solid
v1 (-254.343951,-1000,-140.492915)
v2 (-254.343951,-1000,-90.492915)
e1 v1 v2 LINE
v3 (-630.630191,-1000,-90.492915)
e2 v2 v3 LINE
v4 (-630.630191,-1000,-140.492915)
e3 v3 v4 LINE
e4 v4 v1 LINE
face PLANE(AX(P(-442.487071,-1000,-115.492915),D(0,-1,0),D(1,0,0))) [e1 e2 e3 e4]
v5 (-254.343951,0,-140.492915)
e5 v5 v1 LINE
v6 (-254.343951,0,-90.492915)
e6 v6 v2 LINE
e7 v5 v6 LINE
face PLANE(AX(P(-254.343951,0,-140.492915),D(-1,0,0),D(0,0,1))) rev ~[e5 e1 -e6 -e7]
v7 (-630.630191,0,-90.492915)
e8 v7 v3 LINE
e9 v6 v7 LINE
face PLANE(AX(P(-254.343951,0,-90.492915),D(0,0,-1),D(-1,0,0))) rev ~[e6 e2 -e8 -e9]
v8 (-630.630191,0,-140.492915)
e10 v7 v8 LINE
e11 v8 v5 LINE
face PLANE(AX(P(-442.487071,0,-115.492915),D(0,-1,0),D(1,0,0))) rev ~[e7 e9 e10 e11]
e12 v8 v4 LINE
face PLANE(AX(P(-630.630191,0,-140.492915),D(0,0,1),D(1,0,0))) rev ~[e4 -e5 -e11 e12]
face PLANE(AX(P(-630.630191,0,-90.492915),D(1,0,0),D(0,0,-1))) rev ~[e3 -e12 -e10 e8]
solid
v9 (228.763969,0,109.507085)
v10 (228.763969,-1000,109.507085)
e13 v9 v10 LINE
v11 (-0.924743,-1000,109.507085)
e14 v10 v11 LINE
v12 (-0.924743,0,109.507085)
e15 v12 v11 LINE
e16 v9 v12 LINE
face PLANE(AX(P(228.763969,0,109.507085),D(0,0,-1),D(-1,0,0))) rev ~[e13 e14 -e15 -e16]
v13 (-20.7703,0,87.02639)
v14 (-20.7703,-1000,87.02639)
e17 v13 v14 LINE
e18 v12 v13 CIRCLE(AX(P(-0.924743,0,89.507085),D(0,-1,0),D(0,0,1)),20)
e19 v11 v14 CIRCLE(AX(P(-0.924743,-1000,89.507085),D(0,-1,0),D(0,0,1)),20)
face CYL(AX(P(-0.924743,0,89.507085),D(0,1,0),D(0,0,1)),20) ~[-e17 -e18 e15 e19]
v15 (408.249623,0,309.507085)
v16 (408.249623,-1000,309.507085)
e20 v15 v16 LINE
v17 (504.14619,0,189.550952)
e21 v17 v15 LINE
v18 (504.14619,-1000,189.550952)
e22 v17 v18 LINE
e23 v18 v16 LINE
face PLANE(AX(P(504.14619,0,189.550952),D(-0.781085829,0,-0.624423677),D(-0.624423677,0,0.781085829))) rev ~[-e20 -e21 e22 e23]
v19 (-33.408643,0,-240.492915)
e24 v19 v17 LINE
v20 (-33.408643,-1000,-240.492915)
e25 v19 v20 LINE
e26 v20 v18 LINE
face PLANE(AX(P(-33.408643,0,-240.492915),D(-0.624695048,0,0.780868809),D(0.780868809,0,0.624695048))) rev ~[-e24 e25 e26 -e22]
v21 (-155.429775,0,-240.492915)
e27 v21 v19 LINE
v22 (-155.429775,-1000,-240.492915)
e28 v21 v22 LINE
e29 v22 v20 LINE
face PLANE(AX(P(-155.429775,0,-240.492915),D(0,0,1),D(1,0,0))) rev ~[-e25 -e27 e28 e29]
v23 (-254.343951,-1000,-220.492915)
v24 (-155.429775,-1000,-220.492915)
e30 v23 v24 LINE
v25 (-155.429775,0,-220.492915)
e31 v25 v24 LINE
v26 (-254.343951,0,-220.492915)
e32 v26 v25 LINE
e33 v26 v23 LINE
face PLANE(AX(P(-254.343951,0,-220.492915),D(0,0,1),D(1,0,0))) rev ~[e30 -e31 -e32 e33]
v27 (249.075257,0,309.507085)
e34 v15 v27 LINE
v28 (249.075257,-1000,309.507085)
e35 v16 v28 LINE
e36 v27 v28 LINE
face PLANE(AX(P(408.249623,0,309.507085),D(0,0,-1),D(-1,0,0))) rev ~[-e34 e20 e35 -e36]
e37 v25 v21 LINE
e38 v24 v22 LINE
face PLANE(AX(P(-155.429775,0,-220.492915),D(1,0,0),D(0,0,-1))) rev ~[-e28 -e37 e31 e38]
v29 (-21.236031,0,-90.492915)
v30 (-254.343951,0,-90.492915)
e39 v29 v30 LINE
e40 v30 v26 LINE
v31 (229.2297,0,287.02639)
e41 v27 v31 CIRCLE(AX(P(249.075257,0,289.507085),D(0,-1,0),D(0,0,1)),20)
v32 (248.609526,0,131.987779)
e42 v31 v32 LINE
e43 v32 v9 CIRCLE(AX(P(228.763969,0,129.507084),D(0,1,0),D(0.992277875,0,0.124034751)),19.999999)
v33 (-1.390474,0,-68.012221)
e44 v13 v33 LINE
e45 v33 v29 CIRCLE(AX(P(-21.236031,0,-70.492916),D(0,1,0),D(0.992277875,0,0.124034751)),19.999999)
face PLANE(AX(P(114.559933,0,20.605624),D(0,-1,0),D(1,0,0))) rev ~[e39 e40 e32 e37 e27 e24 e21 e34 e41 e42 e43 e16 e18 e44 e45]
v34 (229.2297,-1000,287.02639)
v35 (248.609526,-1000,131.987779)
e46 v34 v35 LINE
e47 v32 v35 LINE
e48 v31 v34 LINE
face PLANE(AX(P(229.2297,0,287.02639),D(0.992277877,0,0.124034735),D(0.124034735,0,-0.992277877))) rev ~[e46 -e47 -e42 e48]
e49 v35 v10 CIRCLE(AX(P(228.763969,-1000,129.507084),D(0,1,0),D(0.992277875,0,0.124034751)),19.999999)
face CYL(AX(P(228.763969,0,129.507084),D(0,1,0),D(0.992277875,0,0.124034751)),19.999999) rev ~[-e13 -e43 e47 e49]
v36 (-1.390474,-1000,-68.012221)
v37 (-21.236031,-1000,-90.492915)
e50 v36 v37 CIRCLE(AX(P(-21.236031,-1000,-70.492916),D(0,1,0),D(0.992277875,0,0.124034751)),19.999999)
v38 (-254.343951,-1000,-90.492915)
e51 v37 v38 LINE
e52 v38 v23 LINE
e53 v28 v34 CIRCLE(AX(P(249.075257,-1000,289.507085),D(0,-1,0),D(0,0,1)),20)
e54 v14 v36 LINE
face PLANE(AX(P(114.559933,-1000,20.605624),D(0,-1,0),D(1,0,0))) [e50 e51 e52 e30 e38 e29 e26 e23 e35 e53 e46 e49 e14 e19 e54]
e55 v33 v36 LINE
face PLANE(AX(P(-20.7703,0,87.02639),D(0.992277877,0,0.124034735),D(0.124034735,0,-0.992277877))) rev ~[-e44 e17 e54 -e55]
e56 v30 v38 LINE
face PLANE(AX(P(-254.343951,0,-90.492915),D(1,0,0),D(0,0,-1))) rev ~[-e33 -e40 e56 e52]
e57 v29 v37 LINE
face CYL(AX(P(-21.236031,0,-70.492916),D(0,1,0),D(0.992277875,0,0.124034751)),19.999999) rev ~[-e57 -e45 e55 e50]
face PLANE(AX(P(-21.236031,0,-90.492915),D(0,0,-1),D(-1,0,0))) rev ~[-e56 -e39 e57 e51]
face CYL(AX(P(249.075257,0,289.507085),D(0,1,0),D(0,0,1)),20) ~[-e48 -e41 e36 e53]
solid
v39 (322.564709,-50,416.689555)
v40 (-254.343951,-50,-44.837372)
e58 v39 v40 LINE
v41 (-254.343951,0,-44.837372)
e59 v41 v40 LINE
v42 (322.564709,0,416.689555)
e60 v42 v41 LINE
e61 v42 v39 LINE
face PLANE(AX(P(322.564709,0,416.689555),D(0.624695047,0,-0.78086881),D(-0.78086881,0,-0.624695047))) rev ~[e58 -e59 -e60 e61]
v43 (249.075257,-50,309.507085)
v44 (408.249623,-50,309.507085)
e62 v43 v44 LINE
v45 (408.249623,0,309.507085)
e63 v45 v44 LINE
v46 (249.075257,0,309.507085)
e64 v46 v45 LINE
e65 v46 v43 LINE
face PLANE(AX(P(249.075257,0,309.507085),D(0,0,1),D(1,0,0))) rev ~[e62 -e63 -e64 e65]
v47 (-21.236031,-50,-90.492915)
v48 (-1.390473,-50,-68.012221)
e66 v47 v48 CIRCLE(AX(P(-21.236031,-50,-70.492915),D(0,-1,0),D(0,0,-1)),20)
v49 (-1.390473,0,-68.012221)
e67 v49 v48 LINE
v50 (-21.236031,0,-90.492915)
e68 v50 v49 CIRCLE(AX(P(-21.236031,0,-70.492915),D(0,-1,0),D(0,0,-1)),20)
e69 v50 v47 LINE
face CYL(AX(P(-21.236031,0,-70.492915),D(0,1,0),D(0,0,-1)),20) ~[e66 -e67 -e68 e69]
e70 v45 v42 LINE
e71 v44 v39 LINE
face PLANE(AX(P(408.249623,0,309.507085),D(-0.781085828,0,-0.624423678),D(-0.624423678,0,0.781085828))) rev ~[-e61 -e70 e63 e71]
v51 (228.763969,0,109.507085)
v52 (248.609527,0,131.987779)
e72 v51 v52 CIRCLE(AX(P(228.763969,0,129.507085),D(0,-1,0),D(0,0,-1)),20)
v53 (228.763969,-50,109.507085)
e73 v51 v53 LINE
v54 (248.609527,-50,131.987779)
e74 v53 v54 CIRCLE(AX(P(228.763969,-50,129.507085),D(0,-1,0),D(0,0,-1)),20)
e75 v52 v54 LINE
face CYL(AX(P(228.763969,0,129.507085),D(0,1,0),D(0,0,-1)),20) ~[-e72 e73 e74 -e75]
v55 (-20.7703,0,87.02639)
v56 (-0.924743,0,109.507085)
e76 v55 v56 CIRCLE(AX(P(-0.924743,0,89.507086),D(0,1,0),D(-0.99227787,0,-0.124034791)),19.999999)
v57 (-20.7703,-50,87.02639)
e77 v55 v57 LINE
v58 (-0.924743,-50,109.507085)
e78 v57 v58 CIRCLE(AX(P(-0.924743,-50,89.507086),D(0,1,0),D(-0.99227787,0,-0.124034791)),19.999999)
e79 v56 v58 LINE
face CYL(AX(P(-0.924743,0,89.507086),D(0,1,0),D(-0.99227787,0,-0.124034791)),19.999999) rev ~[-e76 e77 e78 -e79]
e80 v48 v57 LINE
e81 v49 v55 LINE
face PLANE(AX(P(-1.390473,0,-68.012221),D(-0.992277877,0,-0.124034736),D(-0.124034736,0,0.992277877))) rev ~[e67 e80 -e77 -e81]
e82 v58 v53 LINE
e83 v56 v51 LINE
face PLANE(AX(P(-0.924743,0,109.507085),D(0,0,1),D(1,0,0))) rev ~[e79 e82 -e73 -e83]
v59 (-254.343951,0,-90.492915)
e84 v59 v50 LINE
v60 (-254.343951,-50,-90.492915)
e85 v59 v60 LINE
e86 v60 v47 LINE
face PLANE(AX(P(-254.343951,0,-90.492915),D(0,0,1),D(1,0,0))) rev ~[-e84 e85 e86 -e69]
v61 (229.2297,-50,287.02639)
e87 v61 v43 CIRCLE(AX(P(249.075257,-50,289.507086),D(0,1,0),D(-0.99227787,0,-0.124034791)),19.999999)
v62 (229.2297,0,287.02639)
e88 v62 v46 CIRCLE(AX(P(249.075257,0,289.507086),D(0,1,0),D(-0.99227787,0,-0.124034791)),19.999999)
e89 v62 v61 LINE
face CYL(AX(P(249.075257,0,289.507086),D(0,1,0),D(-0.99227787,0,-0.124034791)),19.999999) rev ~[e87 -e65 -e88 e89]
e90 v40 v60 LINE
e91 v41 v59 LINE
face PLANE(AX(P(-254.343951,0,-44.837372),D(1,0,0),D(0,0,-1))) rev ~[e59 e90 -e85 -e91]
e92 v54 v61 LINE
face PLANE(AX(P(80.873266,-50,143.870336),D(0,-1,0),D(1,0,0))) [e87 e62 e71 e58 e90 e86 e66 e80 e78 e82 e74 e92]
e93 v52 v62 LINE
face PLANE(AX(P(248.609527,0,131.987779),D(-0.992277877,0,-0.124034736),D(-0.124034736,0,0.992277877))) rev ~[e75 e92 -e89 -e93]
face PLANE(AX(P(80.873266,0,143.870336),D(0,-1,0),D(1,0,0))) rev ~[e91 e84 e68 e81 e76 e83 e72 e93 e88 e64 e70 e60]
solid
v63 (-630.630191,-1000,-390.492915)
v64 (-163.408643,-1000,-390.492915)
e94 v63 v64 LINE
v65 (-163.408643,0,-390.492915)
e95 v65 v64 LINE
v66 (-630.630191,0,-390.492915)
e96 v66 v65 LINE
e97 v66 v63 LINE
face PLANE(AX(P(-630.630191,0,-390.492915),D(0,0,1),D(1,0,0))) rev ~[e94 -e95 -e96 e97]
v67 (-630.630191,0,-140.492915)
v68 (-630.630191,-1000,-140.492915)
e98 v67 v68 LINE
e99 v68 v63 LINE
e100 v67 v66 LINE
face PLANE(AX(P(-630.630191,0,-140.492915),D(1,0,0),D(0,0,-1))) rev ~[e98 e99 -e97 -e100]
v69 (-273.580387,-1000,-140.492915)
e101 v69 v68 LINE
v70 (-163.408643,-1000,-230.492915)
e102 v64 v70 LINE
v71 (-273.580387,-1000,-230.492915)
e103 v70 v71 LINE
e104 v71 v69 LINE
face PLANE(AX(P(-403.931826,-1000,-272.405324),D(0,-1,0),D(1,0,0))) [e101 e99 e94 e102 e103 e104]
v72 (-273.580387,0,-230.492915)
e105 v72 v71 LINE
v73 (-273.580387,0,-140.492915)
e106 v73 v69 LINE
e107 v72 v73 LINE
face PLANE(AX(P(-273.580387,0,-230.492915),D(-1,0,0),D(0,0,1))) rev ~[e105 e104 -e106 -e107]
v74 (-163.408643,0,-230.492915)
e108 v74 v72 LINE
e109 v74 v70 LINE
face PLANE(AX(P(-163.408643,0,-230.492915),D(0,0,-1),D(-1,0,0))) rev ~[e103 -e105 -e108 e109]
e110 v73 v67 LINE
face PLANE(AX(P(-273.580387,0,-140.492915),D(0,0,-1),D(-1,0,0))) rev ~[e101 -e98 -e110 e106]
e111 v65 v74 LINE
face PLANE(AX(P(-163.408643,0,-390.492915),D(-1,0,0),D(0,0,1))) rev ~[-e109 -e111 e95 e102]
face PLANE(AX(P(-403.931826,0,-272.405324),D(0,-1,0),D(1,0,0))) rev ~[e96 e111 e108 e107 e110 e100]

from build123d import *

# Parameters (mm, degrees)
F1_DEPTH = 1000
F2_DEPTH = 50
F3_DEPTH = 1000
F4_DEPTH = 1000


# Not quite as in the source:
# - ends of sketch curves that miss each other by under 0.0002 mm in the source are joined


with BuildPart() as f1:
    # F0 (on Front) → F1 (new body)
    with BuildSketch(Plane.XZ):
        with BuildLine():
            Line((-21.236031, -90.492915), (-254.343951, -90.492915))
            Line((-254.343951, -90.492915), (-254.343951, -140.492915))
            Line((-254.343951, -140.492915), (-254.343951, -220.492915))
            Line((-254.343951, -220.492915), (-155.429775, -220.492915))
            Line((-155.429775, -220.492915), (-155.429775, -240.492915))
            Line((-155.429775, -240.492915), (-33.408643, -240.492915))
            Line((-33.408643, -240.492915), (154.0913568979, -90.4929148724))
            Line((154.0913568979, -90.4929148724), (504.14619, 189.550952))
            Line((504.14619, 189.550952), (408.249622949, 309.5070849592))
            Line((408.249622949, 309.5070849592), (249.075257, 309.507085))
            ThreePointArc((249.075257, 309.507085), (234.0816933606, 302.7431361252), (229.2296995119, 287.026389939))
            Line((229.2296995119, 287.026389939), (248.609526, 131.987779))
            ThreePointArc((248.609526, 131.987779), (243.7575323111, 116.2710335028), (228.763969, 109.507085))
            Line((228.763969, 109.507085), (-0.924743, 109.507085))
            ThreePointArc((-0.924743, 109.507085), (-15.9183066394, 102.7431361252), (-20.7703004881, 87.026389939))
            Line((-20.7703004881, 87.026389939), (-1.390474, -68.012221))
            ThreePointArc((-1.390474, -68.012221), (-6.2424676889, -83.7289664972), (-21.236031, -90.492915))
        make_face()
    extrude(amount=F1_DEPTH)


with BuildPart() as f2:
    # F0 (on Front) → F2 (new body)
    with BuildSketch(Plane.XZ):
        with BuildLine():
            Line((-254.343951, -44.837372), (-254.343951, -90.492915))
            Line((-254.343951, -90.492915), (-21.236031, -90.492915))
            ThreePointArc((-21.236031, -90.492915), (-6.2424676889, -83.7289664972), (-1.3904733888, -68.0122209236))
            Line((-1.3904733888, -68.0122209236), (-20.7703, 87.02639))
            ThreePointArc((-20.7703, 87.02639), (-15.9183066394, 102.7431361252), (-0.924743, 109.507085))
            Line((-0.924743, 109.507085), (228.763969, 109.507085))
            ThreePointArc((228.763969, 109.507085), (243.7575323111, 116.2710335028), (248.6095266112, 131.9877790764))
            Line((248.6095266112, 131.9877790764), (229.2297, 287.02639))
            ThreePointArc((229.2297, 287.02639), (234.0816933606, 302.7431361252), (249.075257, 309.507085))
            Line((249.075257, 309.507085), (408.249623, 309.507085))
            Line((408.249623, 309.507085), (322.5647089299, 416.689554944))
            Line((322.5647089299, 416.689554944), (-254.343951, -44.837372))
        make_face()
    extrude(amount=F2_DEPTH)


with BuildPart() as f3:
    # F0 (on Front) → F3 (new body)
    with BuildSketch(Plane.XZ):
        Polygon((-273.580387, -140.492915), (-630.630191, -140.492915), (-630.630191, -390.492915), (-163.408643, -390.492915), (-163.408643, -230.492915), (-273.580387, -230.492915), align=None)
    extrude(amount=F3_DEPTH)


with BuildPart() as f4:
    # F0 (on Front) → F4 (new body)
    with BuildSketch(Plane.XZ):
        Polygon((-254.343951, -140.492915), (-254.343951, -90.492915), (-630.630191, -90.492915), (-630.630191, -140.492915), (-273.580387, -140.492915), align=None)
    extrude(amount=F4_DEPTH)


solid = Compound([f1.part, f2.part, f3.part, f4.part])
